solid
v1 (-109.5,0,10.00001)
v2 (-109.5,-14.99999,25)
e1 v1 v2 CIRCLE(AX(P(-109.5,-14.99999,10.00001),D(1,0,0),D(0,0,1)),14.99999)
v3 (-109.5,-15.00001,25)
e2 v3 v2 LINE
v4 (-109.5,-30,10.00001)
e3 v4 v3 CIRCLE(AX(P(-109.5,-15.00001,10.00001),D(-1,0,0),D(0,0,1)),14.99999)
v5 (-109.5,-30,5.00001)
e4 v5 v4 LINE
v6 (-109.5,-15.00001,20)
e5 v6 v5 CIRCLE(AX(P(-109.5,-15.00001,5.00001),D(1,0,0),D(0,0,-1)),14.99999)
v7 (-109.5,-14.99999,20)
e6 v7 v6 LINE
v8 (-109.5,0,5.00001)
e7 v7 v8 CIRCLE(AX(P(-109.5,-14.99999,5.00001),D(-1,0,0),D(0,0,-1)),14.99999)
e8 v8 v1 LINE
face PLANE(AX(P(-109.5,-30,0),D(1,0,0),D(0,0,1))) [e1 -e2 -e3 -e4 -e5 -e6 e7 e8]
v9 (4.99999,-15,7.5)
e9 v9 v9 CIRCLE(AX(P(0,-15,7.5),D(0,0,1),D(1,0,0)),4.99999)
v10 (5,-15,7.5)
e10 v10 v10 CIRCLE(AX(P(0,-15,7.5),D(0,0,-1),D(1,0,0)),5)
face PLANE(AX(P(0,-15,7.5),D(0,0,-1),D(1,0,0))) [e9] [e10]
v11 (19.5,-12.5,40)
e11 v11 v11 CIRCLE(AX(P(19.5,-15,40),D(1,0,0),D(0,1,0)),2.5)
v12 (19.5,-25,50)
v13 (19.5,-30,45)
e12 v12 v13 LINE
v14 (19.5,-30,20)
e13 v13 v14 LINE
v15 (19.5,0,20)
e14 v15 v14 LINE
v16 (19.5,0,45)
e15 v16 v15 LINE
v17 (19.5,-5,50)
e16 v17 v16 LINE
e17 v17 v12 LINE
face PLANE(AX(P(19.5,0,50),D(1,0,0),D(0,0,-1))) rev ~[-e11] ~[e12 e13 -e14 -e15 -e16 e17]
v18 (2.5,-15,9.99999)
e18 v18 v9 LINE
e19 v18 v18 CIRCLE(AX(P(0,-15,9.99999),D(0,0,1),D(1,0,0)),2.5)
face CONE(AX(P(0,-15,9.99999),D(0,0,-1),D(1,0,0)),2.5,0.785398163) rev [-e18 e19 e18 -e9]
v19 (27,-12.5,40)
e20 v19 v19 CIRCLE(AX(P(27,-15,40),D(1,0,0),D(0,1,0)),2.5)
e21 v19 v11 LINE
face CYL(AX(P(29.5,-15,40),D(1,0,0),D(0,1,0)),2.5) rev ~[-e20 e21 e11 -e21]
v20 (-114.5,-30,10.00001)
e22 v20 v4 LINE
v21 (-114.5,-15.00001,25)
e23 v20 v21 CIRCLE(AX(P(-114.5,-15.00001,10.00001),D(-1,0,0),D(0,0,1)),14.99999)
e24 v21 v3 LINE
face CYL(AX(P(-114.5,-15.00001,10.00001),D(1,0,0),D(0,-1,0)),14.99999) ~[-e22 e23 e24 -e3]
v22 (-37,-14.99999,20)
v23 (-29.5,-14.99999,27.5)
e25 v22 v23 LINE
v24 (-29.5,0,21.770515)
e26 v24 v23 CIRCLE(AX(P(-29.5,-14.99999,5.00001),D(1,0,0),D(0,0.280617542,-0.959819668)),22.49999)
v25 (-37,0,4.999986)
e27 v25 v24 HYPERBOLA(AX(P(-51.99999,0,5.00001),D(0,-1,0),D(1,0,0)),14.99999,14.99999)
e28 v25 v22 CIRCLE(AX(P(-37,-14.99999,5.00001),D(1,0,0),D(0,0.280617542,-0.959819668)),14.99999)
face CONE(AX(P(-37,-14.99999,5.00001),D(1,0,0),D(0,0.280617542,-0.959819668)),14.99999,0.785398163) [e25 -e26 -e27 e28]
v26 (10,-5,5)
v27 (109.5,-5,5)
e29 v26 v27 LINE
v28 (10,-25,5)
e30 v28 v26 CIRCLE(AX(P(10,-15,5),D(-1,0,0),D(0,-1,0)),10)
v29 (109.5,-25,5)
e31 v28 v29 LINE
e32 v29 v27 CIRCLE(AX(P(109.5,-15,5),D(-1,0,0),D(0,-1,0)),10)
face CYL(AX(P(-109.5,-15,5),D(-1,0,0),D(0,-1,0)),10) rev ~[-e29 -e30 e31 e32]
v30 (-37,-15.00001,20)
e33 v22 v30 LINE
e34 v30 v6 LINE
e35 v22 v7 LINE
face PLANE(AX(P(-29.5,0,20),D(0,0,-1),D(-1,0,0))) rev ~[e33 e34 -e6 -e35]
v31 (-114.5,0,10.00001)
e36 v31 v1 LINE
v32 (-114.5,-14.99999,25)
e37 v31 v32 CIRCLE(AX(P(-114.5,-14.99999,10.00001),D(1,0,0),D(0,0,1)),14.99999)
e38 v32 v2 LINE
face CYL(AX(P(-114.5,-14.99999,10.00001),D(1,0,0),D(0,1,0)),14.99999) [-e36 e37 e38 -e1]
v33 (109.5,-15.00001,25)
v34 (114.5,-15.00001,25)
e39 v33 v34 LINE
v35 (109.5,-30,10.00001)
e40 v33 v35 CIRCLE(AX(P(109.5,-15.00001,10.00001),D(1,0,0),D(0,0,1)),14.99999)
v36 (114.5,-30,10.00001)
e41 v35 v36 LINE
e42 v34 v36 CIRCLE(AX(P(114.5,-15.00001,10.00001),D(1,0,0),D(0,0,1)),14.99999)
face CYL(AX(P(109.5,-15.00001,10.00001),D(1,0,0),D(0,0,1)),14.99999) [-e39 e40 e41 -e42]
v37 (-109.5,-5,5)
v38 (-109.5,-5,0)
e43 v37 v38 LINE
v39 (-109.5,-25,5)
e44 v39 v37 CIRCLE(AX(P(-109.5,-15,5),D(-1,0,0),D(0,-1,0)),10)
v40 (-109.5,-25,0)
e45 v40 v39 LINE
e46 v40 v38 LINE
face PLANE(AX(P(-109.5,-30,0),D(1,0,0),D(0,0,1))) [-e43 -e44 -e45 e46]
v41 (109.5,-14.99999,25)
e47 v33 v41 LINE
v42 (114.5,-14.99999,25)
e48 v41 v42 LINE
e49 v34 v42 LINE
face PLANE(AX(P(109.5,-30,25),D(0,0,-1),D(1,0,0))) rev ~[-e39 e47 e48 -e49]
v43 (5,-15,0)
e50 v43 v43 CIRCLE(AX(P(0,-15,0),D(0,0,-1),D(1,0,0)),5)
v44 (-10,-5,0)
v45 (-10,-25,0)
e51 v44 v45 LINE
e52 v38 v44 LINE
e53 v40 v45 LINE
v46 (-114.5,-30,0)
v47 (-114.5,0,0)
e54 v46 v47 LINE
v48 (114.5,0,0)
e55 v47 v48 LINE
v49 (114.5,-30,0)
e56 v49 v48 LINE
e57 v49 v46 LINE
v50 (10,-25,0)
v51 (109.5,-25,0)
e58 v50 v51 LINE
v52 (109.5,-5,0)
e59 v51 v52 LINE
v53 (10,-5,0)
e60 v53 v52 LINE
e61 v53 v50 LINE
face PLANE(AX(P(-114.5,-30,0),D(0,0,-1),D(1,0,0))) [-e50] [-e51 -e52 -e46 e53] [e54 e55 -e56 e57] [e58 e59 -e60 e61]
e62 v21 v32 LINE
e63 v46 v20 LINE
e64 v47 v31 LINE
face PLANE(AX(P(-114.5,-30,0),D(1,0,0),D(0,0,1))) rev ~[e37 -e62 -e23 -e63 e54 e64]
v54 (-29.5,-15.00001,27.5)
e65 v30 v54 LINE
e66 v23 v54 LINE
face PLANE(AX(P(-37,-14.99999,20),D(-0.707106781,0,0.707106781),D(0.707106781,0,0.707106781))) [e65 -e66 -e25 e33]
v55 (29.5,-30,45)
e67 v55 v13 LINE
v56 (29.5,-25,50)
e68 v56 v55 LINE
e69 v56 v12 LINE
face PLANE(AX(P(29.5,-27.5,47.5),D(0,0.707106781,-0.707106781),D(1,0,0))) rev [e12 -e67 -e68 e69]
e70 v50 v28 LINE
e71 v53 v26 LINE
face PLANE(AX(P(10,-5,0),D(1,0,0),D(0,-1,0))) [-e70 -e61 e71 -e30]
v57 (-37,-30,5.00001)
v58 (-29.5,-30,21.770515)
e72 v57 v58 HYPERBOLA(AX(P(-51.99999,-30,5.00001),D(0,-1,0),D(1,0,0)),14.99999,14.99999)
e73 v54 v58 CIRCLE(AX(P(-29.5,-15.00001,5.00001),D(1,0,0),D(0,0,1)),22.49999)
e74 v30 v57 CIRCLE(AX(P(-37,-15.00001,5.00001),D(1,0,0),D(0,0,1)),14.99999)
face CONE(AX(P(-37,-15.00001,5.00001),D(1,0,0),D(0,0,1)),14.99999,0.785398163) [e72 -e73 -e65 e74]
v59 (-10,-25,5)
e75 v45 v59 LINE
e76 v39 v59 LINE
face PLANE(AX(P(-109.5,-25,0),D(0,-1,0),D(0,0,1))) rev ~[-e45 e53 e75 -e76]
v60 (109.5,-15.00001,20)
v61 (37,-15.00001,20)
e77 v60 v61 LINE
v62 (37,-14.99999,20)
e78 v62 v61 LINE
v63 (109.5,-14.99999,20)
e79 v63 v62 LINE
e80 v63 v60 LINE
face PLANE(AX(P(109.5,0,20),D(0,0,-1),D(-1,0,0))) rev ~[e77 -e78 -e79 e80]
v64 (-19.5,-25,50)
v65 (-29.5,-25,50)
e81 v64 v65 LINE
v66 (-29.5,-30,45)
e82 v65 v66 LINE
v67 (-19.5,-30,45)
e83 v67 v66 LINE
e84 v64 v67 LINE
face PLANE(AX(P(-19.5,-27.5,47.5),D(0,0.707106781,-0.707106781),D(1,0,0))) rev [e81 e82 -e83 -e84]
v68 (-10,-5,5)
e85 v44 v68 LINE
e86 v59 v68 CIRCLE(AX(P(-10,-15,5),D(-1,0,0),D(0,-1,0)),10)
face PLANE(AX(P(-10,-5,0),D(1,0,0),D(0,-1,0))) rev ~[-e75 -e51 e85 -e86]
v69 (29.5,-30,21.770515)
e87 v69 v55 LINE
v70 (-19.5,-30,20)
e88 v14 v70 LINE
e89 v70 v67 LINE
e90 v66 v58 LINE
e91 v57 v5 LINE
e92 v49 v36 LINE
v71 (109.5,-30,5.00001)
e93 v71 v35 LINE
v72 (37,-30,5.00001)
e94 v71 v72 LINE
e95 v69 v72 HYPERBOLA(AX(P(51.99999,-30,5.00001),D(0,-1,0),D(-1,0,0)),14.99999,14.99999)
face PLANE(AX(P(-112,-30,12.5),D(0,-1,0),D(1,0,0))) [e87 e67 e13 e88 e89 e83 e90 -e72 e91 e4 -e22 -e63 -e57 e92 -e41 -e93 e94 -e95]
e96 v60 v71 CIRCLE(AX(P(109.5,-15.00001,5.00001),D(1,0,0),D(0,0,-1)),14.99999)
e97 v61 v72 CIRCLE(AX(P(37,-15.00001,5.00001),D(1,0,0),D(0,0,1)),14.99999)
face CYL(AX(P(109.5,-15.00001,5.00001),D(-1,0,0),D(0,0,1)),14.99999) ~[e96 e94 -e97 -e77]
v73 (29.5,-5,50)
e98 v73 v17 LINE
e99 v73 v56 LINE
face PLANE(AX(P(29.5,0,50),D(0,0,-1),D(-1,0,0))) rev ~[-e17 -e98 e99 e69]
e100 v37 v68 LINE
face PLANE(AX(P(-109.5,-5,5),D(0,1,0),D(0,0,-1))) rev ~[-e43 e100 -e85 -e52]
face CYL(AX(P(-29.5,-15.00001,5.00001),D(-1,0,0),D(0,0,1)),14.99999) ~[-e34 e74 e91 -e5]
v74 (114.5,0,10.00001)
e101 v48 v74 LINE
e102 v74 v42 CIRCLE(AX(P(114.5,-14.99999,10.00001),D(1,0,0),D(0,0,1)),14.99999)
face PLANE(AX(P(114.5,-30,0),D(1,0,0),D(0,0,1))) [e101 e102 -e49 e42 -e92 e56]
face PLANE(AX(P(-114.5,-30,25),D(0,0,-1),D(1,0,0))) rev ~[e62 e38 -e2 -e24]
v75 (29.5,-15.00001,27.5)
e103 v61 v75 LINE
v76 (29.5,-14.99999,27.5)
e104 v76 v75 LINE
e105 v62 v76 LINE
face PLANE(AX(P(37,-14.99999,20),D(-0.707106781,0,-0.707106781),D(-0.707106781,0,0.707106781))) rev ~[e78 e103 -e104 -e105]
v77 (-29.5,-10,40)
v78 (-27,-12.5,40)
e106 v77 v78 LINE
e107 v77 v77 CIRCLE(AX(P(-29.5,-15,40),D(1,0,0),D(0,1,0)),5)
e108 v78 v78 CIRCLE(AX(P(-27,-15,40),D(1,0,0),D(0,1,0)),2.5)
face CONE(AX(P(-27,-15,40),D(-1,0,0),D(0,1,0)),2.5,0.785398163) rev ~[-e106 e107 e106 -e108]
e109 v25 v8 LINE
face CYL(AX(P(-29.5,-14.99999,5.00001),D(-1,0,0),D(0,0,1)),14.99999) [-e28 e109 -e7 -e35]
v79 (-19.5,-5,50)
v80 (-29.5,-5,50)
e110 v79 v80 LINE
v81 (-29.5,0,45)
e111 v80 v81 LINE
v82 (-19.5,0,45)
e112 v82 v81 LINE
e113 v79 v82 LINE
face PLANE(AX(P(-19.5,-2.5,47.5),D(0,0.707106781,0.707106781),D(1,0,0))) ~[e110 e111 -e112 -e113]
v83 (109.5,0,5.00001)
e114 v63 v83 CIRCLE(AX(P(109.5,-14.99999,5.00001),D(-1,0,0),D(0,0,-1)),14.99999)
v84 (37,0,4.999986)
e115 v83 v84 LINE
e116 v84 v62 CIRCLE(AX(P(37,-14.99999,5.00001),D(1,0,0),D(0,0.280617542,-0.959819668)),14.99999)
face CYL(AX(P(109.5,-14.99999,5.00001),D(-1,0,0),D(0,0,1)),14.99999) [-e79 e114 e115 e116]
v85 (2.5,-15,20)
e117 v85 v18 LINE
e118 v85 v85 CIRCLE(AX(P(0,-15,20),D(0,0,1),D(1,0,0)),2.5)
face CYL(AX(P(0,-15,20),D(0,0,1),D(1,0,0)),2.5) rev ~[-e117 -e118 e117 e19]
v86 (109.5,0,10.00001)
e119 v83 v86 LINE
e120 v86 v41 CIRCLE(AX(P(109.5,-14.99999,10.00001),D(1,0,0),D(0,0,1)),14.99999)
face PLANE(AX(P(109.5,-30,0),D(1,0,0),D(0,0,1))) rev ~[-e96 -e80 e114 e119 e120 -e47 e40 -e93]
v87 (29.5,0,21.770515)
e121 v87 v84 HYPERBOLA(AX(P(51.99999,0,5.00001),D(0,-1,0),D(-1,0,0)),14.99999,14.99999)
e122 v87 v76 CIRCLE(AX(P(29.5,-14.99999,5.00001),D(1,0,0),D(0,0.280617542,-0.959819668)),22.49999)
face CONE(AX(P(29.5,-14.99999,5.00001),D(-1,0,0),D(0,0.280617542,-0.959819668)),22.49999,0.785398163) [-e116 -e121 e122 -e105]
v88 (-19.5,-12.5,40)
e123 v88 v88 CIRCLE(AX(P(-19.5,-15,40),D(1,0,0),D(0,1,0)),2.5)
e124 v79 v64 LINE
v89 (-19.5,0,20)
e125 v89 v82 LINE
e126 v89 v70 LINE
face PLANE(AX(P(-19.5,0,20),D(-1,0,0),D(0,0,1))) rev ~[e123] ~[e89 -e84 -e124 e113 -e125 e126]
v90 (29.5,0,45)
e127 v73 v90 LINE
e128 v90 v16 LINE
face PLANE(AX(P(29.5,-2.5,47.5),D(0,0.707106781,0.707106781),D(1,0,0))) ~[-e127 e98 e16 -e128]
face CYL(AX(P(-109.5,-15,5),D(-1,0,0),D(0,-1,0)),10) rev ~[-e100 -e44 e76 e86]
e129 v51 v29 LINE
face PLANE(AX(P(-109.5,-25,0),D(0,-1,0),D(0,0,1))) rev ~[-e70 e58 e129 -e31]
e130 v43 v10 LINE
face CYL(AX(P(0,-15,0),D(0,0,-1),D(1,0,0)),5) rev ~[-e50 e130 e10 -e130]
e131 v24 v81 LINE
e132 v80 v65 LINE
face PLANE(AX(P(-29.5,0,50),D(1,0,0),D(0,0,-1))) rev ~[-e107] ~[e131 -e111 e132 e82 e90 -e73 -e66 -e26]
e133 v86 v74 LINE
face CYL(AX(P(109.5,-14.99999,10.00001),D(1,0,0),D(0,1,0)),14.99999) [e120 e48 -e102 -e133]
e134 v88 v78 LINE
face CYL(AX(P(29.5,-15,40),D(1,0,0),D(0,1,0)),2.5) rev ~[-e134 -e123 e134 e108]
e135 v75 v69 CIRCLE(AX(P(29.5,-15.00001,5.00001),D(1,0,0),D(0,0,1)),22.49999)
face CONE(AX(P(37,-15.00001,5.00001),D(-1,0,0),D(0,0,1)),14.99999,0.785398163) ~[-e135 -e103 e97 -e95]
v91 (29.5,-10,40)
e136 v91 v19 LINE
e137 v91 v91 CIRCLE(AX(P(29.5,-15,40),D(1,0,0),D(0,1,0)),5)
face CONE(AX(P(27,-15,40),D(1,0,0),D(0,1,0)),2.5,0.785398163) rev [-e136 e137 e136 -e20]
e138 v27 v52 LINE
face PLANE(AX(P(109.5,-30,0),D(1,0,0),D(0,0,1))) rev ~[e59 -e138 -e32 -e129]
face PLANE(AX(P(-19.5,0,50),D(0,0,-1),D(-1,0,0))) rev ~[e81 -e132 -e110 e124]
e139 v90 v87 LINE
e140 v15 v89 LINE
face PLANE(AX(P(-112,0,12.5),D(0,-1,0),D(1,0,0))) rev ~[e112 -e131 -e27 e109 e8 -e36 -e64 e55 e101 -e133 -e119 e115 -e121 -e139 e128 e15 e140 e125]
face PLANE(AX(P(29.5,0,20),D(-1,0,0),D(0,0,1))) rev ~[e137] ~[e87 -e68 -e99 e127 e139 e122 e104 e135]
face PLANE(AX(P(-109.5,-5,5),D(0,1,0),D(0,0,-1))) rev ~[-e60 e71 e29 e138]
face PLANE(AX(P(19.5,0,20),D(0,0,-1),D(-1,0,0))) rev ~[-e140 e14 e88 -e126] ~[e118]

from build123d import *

# Parameters (mm, degrees)
F1_DEPTH     = 30
F2_R         = 14.99999
F4_DEPTH     = 219.001
F5_T1_DEPTH  = 2e-05
F5_T6_ANGLE  = 163.702935025
F5_T12_ANGLE = 163.702935025
F5_T18_ANGLE = 163.702935025
F5_T24_ANGLE = 163.702935025
F6_SIZE      = 5
F7_R         = 2.5
F8_DEPTH     = 139.001
F9_W         = 20
F9_H         = 20
F11_R        = 2.5
F12_DEPTH    = 20.001
F13_SIZE     = 2.5
F14_W        = 5
F14_H        = 25
F15_DEPTH    = 30
F16_R        = 14.99999
F17_R        = 5
F18_DEPTH    = 7.5
F19_SIZE     = 2.49999


# Not quite as in the source:
# - a fillet or chamfer that OpenCascade refuses, or shapes differently, is made with other operations: its cross-section is extruded or revolved along the edge and cut away or added
# - a fillet or chamfer is up to 0.001 mm smaller than in the source, because OpenCascade refuses the exact size


with BuildPart() as f1:
    # F0 (on Front) → F1 (new body)
    with BuildSketch(Plane.XZ):
        Polygon((-109.5, 0), (0, 0), (109.5, 0), (109.5, 20), (29.5, 20), (29.5, 50), (19.5, 50), (19.5, 20), (0, 20), (-19.5, 20), (-19.5, 50), (-29.5, 50), (-29.5, 20), (-109.5, 20), align=None)
    extrude(amount=F1_DEPTH)

    # F2 (radius 15 in the source; OpenCascade refuses exactly that, so slightly less here)
    f2_edges = [f1.edges().sort_by_distance(p)[0] for p in [
        (-69.5, 0, 20),
        (-69.5, -30, 20),
        (69.5, 0, 20),
        (69.5, -30, 20),
    ]]
    fillet(f2_edges, radius=F2_R)

    # F3 (on face) → F4 (cut, through all)
    with BuildSketch(Plane(origin=(-109.5, 0, 0), x_dir=(0, -1, 0), z_dir=(-1, 0, 0))):
        with BuildLine():
            Line((25, 0), (25, 5))
            ThreePointArc((25, 5), (15, 15), (5, 5))
            Line((5, 5), (5, 0))
            Line((5, 0), (25, 0))
        make_face()
    extrude(amount=-F4_DEPTH, mode=Mode.SUBTRACT)

    # F5: chamfer of 7.5 on 4 edges, made by hand

    # F5_s2 → F5_t1 (join)
    with BuildSketch(Plane.XZ.offset(14.99999)):
        Polygon((-37, 20), (-29.5, 27.5), (-29.5, 20), align=None)
        Polygon((37, 20), (29.5, 27.5), (29.5, 20), align=None)
    extrude(amount=F5_T1_DEPTH)


with BuildPart() as f5_tool4:
    # F5_s5 → F5_t6 (revolve)
    with BuildSketch(Plane(origin=(0, -12.4720838446, -3.6463990318), x_dir=(1, 0, 0), z_dir=(0, -0.9598196681, -0.2806175417))):
        Polygon((-37, -5.9916217418), (-29.5, -13.4916217418), (-29.5, -5.9916217418), align=None)
    revolve(axis=Axis((-29.5, -14.99999, 5.00001), (1, 0, 0)), revolution_arc=F5_T6_ANGLE)

    split(bisect_by=Plane.XZ, keep=Keep.TOP)

    split(bisect_by=Plane.XY, keep=Keep.TOP)


with BuildPart() as f1_1:
    add(f1.part)

    # F5_t3: union F5_tool4
    add(f5_tool4.part)


with BuildPart() as f5_tool10:
    # F5_s11 → F5_t12 (revolve)
    with BuildSketch(Plane(origin=(0, -12.4720838446, -3.6463990318), x_dir=(1, 0, 0), z_dir=(0, -0.9598196681, -0.2806175417))):
        Polygon((29.5, -13.4916217418), (37, -5.9916217418), (29.5, -5.9916217418), align=None)
    revolve(axis=Axis((29.5, -14.99999, 5.00001), (1, 0, 0)), revolution_arc=F5_T12_ANGLE)

    split(bisect_by=Plane.XZ, keep=Keep.TOP)

    split(bisect_by=Plane.XY, keep=Keep.TOP)


with BuildPart() as f1_2:
    add(f1_1.part)

    # F5_t9: union F5_tool10
    add(f5_tool10.part)


with BuildPart() as f5_tool16:
    # F5_s17 → F5_t18 (revolve)
    with BuildSketch(Plane.XZ.offset(15.00001)):
        Polygon((37, 20), (29.5, 27.5), (29.5, 20), align=None)
    revolve(axis=Axis((29.5, -15.00001, 5.00001), (1, 0, 0)), revolution_arc=F5_T18_ANGLE)

    split(bisect_by=Plane.XY, keep=Keep.TOP)

    split(bisect_by=Plane.XZ.offset(30), keep=Keep.BOTTOM)


with BuildPart() as f1_3:
    add(f1_2.part)

    # F5_t15: union F5_tool16
    add(f5_tool16.part)


with BuildPart() as f5_tool22:
    # F5_s23 → F5_t24 (revolve)
    with BuildSketch(Plane.XZ.offset(15.00001)):
        Polygon((-37, 20), (-29.5, 27.5), (-29.5, 20), align=None)
    revolve(axis=Axis((-29.5, -15.00001, 5.00001), (1, 0, 0)), revolution_arc=F5_T24_ANGLE)

    split(bisect_by=Plane.XY, keep=Keep.TOP)

    split(bisect_by=Plane.XZ.offset(30), keep=Keep.BOTTOM)


with BuildPart() as f1_4:
    add(f1_3.part)

    # F5_t21: union F5_tool22
    add(f5_tool22.part)

    # F6
    f6_edges = [f1_4.edges().sort_by_distance(p)[0] for p in [
        (-24.5, 0, 50),
        (-24.5, -30, 50),
        (24.5, 0, 50),
        (24.5, -30, 50),
    ]]
    chamfer(f6_edges, length=F6_SIZE)

    # F7 (on face) → F8 (cut, through all)
    with BuildSketch(Plane.YZ.offset(29.5)):
        with Locations((-15, 40)):
            Circle(F7_R)
    extrude(amount=-F8_DEPTH, mode=Mode.SUBTRACT)

    # F9 (on face) → F10 (join, up to the next surface of F1)
    with BuildSketch(Plane(origin=(0, 0, 0), x_dir=(1, 0, 0), z_dir=(0, 0, -1))):
        with Locations((0, 15)):
            Rectangle(F9_W, F9_H)
    extrude(until=Until.NEXT, dir=(0, 0, 1))

    # F11 (on face) → F12 (cut, through all)
    with BuildSketch(Plane.XY.offset(20)):
        with Locations((0, -15)):
            Circle(F11_R)
    extrude(amount=-F12_DEPTH, mode=Mode.SUBTRACT)

    # F13
    f13_edges = [f1_4.edges().sort_by_distance(p)[0] for p in [
        (-29.5, -17.5, 40),
        (29.5, -17.5, 40),
    ]]
    chamfer(f13_edges, length=F13_SIZE)

    # F14 (on face) → F15 (join, through all)
    with BuildSketch(Plane.XZ.offset(30)):
        with Locations((-112, 12.5)):
            Rectangle(F14_W, F14_H)
        with Locations((112, 12.5)):
            Rectangle(F14_W, F14_H)
    extrude(amount=-F15_DEPTH)

    # F16 (radius 15 in the source; OpenCascade refuses exactly that, so slightly less here)
    f16_edges = [f1_4.edges().sort_by_distance(p)[0] for p in [
        (112, 0, 25),
        (112, -30, 25),
        (-112, -30, 25),
        (-112, 0, 25),
    ]]
    fillet(f16_edges, radius=F16_R)

    # F17 (on face) → F18 (cut)
    with BuildSketch(Plane(origin=(0, 0, 0), x_dir=(1, 0, 0), z_dir=(0, 0, -1))):
        with Locations((0, 15)):
            Circle(F17_R)
    extrude(amount=-F18_DEPTH, mode=Mode.SUBTRACT)

    # F19 (size 2.5 in the source; OpenCascade refuses exactly that, so slightly less here)
    f19_edges = [f1_4.edges().sort_by_distance(p)[0] for p in [
        (-2.5, -15, 7.5),
    ]]
    chamfer(f19_edges, length=F19_SIZE)


solid = f1_4.part
